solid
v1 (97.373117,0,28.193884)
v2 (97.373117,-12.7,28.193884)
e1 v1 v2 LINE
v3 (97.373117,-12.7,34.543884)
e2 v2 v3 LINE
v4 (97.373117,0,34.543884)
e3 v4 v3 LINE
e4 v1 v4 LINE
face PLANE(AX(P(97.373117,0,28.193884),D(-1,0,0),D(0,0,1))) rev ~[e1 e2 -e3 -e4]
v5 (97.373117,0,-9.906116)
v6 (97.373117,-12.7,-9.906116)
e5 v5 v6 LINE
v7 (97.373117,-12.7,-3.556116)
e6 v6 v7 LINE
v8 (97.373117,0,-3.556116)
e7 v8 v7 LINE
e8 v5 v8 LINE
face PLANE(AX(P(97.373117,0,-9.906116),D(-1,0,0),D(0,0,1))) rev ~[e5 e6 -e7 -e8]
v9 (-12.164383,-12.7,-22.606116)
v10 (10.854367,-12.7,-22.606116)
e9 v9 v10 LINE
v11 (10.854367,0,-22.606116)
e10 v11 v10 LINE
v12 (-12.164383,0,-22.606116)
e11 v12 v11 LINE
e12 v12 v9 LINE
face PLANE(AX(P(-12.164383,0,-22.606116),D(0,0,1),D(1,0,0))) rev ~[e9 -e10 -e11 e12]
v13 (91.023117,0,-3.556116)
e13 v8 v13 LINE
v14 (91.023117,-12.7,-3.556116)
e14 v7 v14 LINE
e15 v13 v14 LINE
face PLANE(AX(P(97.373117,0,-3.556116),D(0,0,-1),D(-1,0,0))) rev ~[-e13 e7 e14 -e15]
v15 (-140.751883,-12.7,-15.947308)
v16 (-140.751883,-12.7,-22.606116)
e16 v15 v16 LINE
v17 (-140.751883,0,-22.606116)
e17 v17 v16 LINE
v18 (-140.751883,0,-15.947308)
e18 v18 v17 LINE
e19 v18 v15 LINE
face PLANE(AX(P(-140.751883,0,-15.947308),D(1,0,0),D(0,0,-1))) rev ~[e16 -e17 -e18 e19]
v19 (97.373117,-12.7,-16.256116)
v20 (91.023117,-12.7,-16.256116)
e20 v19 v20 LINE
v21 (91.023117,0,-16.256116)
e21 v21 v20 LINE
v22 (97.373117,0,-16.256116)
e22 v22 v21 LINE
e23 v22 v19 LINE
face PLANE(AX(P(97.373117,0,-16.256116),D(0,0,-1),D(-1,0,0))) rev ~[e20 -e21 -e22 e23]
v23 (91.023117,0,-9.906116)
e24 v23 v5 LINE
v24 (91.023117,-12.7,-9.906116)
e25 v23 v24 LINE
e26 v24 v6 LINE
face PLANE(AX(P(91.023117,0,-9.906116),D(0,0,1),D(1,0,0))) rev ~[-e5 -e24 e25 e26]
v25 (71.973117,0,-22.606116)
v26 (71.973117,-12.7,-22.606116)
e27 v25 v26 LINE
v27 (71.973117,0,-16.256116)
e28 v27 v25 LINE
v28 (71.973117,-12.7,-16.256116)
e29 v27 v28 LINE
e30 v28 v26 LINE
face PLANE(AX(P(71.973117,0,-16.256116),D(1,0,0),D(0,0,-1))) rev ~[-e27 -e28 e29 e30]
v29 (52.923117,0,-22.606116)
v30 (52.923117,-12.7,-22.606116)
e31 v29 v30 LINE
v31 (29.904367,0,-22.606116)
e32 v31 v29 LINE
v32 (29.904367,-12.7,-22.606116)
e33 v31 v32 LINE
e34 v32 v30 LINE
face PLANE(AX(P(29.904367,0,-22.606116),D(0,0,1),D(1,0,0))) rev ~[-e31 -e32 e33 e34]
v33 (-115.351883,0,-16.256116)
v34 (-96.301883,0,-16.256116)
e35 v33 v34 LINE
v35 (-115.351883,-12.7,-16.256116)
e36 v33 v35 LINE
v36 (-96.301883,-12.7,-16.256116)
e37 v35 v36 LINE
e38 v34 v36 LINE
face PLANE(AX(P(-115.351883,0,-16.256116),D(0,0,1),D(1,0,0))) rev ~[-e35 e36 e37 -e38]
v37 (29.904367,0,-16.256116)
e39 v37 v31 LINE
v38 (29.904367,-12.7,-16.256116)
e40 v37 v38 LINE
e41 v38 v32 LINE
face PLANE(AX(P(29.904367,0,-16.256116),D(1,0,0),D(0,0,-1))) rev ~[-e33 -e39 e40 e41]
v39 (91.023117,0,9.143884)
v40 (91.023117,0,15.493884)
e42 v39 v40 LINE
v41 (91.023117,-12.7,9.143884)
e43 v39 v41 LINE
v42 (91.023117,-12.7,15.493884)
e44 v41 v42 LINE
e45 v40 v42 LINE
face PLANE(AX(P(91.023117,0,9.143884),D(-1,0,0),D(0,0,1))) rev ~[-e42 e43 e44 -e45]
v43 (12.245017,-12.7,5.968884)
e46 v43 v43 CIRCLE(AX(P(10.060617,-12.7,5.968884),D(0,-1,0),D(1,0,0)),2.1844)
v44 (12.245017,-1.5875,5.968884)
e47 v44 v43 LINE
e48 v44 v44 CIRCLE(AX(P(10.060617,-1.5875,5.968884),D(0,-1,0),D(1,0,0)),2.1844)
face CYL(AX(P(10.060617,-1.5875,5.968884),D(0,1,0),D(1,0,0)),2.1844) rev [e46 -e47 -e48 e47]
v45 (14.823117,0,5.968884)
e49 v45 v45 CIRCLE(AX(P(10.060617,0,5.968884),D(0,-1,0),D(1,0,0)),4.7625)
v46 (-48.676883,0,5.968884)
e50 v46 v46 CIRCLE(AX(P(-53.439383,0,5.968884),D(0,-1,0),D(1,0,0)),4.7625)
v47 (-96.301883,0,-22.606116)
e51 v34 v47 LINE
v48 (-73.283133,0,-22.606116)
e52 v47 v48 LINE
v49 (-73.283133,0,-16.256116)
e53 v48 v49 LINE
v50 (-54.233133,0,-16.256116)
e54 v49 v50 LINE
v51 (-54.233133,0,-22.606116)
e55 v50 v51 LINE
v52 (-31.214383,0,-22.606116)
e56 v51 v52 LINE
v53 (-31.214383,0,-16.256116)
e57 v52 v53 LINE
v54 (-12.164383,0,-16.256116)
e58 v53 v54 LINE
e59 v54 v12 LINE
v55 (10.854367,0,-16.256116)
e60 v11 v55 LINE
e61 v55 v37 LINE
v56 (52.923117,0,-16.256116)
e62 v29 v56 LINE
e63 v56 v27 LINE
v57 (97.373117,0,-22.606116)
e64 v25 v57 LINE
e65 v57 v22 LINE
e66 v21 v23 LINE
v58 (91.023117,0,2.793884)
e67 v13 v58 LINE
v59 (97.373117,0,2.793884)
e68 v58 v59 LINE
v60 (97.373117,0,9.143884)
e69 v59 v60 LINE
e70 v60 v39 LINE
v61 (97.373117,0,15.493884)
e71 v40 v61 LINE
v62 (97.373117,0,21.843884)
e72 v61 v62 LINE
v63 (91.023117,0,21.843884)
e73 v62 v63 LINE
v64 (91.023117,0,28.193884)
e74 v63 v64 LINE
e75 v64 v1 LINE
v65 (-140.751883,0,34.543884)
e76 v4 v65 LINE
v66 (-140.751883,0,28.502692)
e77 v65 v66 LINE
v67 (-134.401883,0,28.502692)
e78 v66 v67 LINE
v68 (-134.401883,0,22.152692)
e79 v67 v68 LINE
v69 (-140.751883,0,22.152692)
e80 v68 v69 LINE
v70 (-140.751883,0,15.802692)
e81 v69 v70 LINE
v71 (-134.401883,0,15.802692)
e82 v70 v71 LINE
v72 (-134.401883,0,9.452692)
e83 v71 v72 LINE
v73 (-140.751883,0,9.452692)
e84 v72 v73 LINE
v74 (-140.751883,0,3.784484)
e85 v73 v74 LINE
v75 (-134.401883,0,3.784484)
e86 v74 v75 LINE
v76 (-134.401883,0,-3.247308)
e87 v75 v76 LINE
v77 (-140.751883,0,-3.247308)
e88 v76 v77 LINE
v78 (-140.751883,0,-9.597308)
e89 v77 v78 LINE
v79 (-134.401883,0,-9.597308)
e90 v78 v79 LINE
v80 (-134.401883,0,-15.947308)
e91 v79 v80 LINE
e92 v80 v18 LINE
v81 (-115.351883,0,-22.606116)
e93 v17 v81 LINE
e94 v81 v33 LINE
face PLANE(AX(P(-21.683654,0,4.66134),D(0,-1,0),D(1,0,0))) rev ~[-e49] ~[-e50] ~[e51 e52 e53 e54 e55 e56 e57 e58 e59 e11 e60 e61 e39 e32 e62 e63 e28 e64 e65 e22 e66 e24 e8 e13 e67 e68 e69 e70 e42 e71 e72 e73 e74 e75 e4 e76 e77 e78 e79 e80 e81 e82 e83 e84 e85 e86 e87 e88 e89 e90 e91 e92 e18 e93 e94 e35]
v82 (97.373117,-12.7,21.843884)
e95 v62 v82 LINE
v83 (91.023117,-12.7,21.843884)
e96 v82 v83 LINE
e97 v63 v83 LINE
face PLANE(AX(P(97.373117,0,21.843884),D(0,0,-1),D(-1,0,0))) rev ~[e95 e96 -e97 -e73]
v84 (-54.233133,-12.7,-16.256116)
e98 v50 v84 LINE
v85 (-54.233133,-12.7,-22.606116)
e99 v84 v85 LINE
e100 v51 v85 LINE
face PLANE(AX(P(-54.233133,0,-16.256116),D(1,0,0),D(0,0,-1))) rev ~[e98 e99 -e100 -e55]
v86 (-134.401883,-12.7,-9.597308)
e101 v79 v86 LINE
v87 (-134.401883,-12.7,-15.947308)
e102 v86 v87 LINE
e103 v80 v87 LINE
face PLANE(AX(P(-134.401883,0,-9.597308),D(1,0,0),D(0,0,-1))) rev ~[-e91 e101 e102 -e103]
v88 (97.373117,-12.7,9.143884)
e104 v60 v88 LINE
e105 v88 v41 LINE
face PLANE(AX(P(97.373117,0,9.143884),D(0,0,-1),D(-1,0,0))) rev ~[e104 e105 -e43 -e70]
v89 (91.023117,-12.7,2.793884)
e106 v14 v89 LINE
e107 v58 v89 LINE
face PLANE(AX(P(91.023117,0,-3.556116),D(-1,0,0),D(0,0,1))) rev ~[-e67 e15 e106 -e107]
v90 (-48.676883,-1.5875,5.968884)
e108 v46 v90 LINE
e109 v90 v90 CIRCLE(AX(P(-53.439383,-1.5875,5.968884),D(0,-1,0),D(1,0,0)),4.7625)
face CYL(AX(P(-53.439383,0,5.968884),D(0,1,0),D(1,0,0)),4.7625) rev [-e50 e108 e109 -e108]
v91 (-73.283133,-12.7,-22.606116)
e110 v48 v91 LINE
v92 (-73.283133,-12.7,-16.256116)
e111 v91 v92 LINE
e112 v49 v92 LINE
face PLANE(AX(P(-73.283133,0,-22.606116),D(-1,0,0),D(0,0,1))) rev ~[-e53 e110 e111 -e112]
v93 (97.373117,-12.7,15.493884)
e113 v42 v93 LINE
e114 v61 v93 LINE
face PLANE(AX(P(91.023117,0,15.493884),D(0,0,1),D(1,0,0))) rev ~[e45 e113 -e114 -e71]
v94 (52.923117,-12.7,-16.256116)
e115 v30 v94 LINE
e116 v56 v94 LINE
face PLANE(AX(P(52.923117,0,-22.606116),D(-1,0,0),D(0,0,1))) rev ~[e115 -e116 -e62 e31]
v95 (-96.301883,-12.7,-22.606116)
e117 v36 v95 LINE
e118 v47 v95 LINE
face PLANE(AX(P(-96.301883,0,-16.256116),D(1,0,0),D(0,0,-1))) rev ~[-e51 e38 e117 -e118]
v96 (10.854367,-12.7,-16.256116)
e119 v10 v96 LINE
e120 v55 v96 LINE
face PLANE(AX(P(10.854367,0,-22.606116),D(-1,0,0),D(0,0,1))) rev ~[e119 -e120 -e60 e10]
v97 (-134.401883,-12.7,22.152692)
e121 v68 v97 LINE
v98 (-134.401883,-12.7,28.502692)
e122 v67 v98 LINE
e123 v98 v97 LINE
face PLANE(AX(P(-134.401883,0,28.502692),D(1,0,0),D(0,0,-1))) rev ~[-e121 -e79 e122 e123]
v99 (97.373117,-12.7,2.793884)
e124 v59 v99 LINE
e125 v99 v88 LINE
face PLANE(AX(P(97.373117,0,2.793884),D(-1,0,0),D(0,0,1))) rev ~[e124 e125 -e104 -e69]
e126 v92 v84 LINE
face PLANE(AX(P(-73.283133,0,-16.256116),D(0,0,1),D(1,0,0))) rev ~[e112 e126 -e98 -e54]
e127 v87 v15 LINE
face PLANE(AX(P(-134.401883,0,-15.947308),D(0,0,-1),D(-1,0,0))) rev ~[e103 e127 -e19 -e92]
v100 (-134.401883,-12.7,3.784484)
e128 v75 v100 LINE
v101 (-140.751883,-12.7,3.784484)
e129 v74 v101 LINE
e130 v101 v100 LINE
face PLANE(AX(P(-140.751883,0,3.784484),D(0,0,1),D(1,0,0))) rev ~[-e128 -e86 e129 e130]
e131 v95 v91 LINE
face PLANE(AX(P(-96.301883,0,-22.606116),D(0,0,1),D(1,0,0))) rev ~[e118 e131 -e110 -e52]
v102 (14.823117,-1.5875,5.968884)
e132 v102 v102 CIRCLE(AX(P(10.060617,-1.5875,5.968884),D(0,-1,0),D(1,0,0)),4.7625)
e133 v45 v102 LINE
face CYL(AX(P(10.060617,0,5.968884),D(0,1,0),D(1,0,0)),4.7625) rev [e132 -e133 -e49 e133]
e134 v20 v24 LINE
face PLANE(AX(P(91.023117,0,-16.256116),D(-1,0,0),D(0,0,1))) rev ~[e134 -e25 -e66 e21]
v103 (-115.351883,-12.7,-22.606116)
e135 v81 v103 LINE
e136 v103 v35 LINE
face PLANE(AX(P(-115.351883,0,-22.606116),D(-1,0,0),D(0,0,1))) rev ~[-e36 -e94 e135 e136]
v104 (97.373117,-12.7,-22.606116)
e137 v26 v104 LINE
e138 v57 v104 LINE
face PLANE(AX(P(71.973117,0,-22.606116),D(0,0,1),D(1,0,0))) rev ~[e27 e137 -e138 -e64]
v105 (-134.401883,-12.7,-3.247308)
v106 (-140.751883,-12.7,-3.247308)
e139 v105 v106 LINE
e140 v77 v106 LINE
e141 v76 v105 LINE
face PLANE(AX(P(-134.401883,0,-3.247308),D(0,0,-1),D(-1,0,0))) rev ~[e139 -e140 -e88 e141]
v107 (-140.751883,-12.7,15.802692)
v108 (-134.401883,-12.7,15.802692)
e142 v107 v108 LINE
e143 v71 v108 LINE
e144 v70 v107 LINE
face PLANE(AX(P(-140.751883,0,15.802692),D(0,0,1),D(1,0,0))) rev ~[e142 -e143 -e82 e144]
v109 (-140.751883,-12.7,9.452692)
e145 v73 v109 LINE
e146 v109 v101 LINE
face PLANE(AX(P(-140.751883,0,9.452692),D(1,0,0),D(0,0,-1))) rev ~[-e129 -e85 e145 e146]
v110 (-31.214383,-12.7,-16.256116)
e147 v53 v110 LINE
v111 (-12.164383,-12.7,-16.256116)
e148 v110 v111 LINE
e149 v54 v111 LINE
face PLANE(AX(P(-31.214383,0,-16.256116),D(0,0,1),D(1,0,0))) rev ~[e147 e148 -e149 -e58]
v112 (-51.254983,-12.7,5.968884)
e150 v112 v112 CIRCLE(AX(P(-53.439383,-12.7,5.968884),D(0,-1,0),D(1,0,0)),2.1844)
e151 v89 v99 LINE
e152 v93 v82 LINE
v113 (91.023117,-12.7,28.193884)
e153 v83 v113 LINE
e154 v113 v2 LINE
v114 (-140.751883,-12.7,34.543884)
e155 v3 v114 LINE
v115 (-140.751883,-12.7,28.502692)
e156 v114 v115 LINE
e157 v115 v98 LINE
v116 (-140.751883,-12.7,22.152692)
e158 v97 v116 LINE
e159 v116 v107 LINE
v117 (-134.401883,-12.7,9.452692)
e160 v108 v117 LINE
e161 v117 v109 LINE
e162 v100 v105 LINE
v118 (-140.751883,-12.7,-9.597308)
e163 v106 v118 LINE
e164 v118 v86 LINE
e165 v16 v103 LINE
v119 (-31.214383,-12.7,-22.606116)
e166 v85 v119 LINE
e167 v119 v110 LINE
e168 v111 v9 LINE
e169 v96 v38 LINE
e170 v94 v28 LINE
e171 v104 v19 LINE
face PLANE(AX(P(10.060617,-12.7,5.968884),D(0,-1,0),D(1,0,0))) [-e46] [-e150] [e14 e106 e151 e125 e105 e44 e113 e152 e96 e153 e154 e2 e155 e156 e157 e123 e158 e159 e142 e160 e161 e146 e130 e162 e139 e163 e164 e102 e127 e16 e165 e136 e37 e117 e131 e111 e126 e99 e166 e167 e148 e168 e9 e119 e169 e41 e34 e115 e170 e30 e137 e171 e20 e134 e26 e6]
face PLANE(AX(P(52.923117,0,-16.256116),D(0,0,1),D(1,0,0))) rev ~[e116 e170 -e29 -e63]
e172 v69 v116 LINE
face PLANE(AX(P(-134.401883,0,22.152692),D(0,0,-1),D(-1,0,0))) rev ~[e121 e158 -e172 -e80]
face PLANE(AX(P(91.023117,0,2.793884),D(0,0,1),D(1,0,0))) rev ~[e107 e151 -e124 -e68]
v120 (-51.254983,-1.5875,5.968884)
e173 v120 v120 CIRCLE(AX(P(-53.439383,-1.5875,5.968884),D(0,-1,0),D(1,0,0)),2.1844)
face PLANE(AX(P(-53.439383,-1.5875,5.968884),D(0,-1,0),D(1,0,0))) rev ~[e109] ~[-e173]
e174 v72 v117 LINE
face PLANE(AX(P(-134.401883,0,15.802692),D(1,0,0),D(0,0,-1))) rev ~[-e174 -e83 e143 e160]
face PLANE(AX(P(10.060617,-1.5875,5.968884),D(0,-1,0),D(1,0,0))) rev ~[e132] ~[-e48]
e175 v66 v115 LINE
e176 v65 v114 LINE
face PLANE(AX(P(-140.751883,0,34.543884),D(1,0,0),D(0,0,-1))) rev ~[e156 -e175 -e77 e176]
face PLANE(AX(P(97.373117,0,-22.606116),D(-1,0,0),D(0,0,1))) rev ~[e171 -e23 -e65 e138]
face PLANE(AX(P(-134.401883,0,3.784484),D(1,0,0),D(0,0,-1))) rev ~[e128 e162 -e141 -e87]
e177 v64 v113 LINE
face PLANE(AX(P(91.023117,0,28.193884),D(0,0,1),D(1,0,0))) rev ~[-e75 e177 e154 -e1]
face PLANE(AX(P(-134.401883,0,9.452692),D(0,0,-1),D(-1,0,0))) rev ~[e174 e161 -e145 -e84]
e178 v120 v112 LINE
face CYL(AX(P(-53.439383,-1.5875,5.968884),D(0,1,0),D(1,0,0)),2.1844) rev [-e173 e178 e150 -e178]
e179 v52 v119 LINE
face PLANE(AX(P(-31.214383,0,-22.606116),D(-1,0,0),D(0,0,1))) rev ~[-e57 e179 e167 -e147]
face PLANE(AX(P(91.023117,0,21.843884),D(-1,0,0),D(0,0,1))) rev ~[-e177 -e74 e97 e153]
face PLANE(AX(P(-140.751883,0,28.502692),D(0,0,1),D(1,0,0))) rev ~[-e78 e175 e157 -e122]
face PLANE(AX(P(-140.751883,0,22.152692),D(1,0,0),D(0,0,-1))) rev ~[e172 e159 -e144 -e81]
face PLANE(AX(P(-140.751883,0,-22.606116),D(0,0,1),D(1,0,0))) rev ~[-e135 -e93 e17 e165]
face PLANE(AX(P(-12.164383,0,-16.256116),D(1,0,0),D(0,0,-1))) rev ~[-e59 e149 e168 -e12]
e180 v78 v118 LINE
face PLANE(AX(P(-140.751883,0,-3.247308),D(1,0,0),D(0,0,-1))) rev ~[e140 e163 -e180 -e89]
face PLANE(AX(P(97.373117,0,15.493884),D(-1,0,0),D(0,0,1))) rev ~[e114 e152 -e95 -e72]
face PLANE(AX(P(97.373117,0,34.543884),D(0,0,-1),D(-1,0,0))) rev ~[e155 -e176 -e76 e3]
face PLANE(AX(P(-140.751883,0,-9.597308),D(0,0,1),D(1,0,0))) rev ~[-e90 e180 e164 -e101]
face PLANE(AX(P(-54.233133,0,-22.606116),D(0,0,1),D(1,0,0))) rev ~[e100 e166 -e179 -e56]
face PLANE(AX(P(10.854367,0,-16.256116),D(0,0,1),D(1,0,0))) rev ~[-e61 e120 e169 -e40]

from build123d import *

# Parameters (mm, degrees)
F0_R     = 4.7625
F1_DEPTH = 12.7
F2_START = 1.5875
F0_R_2   = 2.1844
F2_DEPTH = 11.1125
F3_START = 1.5875
F3_DEPTH = 11.1125


# Not quite as in the source:
# - a feature names something its author has since deleted; it is built from what else it names


with BuildPart() as f1:
    # F0 (on Front) → F1 (new body)
    with BuildSketch(Plane.XZ):
        Polygon((97.3731166124, 28.1938837487), (97.3731166124, 34.5438837487), (-140.7518833876, 34.5438837487), (-140.7518833876, 28.5026916087), (-134.4018833876, 28.5026916087), (-134.4018833876, 22.1526916087), (-140.7518833876, 22.1526916087), (-140.7518833876, 15.8026916087), (-134.4018833876, 15.8026916087), (-134.4018833876, 9.4526916087), (-140.7518833876, 9.4526916087), (-140.7518833876, 3.7844837487), (-134.4018833876, 3.7844837487), (-134.4018833876, -3.2473083913), (-140.7518833876, -3.2473083913), (-140.7518833876, -9.5973083913), (-134.4018833876, -9.5973083913), (-134.4018833876, -15.9473083913), (-140.7518833876, -15.9473083913), (-140.7518833876, -22.6061162513), (-115.3518833876, -22.6061162513), (-115.3518833876, -16.2561162513), (-96.3018833876, -16.2561162513), (-96.3018833876, -22.6061162513), (-73.2831333876, -22.6061162513), (-73.2831333876, -16.2561162513), (-54.2331333876, -16.2561162513), (-54.2331333876, -22.6061162513), (-31.2143833876, -22.6061162513), (-31.2143833876, -16.2561162513), (-12.1643833876, -16.2561162513), (-12.1643833876, -22.6061162513), (10.8543666124, -22.6061162513), (10.8543666124, -16.2561162513), (29.9043666124, -16.2561162513), (29.9043666124, -22.6061162513), (52.9231166124, -22.6061162513), (52.9231166124, -16.2561162513), (71.9731166124, -16.2561162513), (71.9731166124, -22.6061162513), (97.3731166124, -22.6061162513), (97.3731166124, -16.2561162513), (91.0231166124, -16.2561162513), (91.0231166124, -9.9061162513), (97.3731166124, -9.9061162513), (97.3731166124, -3.5561162513), (91.0231166124, -3.5561162513), (91.0231166124, 2.7938837487), (97.3731166124, 2.7938837487), (97.3731166124, 9.1438837487), (91.0231166124, 9.1438837487), (91.0231166124, 15.4938837487), (97.3731166124, 15.4938837487), (97.3731166124, 21.8438837487), (91.0231166124, 21.8438837487), (91.0231166124, 28.1938837487), align=None)
        with Locations((-53.4393833876, 5.9688837487)):
            Circle(F0_R, mode=Mode.SUBTRACT)
        with Locations((10.0606166124, 5.9688837487)):
            Circle(F0_R, mode=Mode.SUBTRACT)
    extrude(amount=F1_DEPTH)

    # F0 (on Front) → F2 (join)
    with BuildSketch(Plane.XZ.offset(F2_START)):
        with Locations((-53.4393833876, 5.9688837487)):
            Circle(F0_R)
        with Locations((-53.4393833876, 5.9688837487)):
            Circle(F0_R_2, mode=Mode.SUBTRACT)
    extrude(amount=F2_DEPTH)

    # F0 (on Front) → F3 (join)
    with BuildSketch(Plane.XZ.offset(F3_START)):
        with Locations((10.0606166124, 5.9688837487)):
            Circle(F0_R)
        with Locations((10.0606166124, 5.9688837487)):
            Circle(F0_R_2, mode=Mode.SUBTRACT)
    extrude(amount=F3_DEPTH)


solid = f1.part
